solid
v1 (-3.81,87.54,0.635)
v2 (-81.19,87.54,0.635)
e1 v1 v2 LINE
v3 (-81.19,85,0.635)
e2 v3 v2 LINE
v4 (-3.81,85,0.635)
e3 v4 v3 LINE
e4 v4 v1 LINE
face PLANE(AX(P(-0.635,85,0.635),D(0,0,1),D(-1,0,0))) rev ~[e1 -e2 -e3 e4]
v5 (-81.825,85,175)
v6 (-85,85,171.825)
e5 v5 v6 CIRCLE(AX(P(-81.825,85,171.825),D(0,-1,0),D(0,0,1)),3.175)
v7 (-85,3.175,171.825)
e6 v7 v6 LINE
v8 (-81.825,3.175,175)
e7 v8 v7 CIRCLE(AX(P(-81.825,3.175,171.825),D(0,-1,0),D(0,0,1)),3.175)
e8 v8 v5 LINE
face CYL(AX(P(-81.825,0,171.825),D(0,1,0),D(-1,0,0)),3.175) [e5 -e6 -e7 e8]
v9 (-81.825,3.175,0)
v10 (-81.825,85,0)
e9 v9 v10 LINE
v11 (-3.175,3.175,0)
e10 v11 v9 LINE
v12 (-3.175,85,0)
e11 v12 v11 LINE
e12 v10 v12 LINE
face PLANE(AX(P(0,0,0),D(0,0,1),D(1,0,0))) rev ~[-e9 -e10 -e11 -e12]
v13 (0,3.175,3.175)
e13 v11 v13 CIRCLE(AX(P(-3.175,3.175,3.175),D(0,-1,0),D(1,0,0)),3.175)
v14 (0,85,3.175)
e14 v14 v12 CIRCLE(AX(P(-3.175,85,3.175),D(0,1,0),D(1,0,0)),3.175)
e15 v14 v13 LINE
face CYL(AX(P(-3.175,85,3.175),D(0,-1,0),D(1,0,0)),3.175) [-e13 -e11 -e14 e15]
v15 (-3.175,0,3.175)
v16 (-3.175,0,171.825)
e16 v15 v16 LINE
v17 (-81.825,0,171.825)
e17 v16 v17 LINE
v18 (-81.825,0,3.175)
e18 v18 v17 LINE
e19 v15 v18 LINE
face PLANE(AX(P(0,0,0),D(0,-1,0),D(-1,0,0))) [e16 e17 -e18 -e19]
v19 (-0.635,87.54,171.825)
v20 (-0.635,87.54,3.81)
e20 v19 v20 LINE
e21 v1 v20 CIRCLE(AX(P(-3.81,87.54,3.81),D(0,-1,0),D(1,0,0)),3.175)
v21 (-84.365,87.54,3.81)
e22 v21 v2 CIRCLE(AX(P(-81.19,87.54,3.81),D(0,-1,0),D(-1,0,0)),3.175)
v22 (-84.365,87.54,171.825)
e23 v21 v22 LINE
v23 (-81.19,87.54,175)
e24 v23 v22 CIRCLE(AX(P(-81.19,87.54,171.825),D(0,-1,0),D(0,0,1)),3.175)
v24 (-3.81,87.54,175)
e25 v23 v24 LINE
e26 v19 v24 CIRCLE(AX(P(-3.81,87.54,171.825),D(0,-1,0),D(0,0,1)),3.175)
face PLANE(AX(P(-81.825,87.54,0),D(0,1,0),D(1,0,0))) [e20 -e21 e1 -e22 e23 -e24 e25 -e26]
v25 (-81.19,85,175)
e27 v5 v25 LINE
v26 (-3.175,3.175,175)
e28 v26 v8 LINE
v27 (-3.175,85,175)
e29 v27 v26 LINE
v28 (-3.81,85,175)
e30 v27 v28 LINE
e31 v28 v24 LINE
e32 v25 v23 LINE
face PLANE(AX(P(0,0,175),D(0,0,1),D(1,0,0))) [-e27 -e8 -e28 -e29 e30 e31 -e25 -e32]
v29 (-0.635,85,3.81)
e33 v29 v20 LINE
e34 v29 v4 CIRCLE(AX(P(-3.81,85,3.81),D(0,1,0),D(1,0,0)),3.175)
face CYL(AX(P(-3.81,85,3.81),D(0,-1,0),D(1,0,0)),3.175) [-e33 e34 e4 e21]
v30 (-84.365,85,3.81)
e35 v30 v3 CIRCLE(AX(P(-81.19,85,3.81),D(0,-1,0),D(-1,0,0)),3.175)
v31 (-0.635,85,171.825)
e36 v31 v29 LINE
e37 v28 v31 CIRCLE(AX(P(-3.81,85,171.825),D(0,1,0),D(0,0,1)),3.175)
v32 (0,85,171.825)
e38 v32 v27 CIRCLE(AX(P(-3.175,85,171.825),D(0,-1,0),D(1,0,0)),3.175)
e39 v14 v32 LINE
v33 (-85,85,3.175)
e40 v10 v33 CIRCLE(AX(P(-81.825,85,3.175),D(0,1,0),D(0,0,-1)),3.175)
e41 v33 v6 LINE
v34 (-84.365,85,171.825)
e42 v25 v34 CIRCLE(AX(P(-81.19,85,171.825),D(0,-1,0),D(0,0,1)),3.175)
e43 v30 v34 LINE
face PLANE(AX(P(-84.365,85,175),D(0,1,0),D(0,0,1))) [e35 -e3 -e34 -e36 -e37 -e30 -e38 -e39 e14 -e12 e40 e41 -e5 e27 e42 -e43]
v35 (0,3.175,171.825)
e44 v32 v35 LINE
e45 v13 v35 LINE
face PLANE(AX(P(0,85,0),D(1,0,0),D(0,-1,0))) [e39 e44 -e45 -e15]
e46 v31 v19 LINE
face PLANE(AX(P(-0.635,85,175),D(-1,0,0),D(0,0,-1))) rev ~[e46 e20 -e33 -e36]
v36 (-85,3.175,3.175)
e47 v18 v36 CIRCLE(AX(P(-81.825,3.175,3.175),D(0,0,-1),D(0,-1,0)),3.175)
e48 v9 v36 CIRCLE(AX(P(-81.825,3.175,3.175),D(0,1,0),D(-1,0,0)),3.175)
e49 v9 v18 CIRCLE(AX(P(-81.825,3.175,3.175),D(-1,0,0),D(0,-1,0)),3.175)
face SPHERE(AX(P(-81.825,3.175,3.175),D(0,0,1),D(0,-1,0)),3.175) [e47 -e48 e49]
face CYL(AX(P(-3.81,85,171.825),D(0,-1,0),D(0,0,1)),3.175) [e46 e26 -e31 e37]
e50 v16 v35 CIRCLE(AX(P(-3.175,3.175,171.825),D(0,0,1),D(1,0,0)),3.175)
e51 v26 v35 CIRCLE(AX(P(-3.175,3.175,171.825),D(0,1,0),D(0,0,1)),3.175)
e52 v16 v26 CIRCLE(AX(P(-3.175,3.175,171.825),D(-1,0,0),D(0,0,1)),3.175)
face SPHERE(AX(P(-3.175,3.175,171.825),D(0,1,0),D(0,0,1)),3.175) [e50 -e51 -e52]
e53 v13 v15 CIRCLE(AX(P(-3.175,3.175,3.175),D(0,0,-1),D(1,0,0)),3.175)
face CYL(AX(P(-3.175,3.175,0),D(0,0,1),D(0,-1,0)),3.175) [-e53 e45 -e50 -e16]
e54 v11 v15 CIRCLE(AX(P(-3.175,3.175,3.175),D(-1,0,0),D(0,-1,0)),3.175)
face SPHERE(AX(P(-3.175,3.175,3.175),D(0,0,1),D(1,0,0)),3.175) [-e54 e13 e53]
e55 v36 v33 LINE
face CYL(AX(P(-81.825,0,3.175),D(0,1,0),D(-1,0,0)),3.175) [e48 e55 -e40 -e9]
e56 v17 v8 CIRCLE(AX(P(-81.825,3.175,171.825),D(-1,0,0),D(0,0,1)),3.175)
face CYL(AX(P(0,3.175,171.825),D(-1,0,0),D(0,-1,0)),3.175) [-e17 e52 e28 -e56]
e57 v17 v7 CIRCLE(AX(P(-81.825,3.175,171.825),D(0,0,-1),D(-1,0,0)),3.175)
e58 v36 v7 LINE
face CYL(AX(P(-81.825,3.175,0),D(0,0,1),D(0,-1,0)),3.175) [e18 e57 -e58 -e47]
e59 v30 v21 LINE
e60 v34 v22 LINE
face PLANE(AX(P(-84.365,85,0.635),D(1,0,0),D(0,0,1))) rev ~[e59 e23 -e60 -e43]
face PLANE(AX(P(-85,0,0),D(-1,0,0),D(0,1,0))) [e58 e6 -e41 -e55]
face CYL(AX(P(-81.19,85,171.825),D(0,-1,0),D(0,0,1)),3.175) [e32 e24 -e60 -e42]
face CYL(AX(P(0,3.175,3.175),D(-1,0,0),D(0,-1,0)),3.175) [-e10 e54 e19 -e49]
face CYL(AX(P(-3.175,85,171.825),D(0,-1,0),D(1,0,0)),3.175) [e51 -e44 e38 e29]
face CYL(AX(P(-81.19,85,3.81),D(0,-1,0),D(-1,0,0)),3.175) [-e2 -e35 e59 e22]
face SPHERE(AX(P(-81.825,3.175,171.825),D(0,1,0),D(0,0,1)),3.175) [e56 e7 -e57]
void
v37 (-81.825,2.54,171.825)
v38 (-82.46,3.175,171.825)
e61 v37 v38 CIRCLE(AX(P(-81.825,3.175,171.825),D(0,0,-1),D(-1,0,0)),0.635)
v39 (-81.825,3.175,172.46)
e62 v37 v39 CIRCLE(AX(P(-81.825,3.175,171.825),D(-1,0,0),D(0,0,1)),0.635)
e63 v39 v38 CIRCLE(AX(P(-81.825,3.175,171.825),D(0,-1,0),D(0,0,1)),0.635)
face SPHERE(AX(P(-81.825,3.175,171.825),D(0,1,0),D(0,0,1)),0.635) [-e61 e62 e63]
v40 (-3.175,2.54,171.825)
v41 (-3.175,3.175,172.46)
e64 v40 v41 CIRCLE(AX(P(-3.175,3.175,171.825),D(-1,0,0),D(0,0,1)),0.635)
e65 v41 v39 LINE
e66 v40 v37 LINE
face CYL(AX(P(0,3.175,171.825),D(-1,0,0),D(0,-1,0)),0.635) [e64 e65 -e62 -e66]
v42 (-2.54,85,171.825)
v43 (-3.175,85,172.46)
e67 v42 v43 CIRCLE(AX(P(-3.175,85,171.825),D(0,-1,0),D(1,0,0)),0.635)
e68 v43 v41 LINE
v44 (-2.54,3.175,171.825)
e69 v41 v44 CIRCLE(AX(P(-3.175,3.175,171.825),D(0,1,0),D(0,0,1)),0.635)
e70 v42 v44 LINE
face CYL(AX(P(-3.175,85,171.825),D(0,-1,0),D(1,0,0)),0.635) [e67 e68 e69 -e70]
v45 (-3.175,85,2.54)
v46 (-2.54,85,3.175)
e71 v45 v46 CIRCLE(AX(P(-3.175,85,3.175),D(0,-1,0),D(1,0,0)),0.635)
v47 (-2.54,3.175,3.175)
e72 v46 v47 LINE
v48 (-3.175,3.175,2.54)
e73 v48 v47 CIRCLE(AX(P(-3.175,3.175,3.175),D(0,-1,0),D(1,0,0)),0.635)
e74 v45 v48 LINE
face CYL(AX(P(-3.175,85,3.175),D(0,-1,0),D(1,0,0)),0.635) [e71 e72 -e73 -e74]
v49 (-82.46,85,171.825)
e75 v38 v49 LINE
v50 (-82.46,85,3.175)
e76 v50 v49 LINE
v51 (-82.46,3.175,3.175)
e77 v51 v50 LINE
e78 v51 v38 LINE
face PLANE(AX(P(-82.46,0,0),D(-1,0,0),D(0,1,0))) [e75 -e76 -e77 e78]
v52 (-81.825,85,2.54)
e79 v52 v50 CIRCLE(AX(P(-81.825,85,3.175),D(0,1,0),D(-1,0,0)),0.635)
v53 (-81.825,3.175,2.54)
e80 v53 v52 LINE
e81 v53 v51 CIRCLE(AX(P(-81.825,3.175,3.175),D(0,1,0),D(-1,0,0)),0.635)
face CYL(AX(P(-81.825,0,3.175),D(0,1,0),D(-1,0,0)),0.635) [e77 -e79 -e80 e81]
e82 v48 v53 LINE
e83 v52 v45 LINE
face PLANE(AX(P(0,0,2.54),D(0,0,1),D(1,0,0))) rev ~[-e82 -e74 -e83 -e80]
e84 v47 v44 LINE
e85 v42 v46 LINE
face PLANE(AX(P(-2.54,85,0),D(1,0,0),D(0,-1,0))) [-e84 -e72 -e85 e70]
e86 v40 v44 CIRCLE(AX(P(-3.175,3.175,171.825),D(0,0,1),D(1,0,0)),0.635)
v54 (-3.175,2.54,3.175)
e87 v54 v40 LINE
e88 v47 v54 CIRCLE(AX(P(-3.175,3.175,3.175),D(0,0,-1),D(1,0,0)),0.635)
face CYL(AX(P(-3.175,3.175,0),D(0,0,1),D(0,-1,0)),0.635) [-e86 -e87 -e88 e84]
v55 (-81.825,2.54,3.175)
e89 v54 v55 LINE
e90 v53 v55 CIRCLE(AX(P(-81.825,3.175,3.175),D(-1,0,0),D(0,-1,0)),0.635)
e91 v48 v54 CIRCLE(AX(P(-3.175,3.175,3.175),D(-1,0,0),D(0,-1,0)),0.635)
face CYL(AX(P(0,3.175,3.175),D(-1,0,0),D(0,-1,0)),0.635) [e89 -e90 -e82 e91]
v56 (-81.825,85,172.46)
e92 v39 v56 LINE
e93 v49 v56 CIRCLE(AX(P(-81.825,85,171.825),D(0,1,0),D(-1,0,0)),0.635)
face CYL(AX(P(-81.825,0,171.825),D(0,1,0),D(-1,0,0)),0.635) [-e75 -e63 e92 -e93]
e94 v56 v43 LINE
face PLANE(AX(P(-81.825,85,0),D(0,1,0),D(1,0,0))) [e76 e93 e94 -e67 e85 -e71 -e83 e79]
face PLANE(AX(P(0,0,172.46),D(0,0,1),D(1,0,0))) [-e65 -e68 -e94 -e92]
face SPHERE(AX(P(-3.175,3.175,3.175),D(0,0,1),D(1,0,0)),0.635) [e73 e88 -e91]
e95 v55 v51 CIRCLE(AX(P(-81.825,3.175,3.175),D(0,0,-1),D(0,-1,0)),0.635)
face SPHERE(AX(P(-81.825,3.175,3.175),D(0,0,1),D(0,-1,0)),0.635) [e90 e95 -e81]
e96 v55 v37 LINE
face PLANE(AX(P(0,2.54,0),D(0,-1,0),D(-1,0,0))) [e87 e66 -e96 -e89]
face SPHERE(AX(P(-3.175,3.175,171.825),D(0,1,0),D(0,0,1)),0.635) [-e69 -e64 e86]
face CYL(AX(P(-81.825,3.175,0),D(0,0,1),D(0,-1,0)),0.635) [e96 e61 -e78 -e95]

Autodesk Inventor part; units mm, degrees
ref_plane "YZ Plane" through (0, 0, 0) normal (1, 0, 0) x (0, 1, 0)
ref_plane "XZ Plane" through (0, 0, 0) normal (0, 1, 0) x (-1, 0, 0)
ref_plane "XY Plane" through (0, 0, 0) normal (0, 0, 1) x (1, 0, 0)
sketch "Sketch1" plane through (0, 0, 0) normal (0, 0, 1) x (1, 0, 0)
  line L0 (0, 0) -> (-85, 0)
  line L1 (-85, 0) -> (-85, 85)
  line L2 (-85, 85) -> (0, 85)
  line L3 (0, 85) -> (0, 0)
  dimension "d0" = 85
  dimension "d1" = 85
extrude "Extrusion1" add sketch "Sketch1" along normal blind 175
fillet "Fillet2" radius 3.175 8 edges at (-85, 42.5, 175) (0, 42.5, 175) (-42.5, 0, 175) (-85, 0, 87.5) (0, 0, 87.5) (0, 42.5, 0) (-42.5, 0, 0) (-85, 42.5, 0)
shell "Shell1" thickness 2.54 removed faces 1 at (-28.3333, 85, 59.3917)
sketch "Sketch2" plane through (-81.825, 85, 0) normal (0, 1, 0) x (1, 0, 0)
  line L0 (-2.54, -175) -> (81.19, -175)
  line L1 (81.19, -175) -> (81.19, -0.635)
  line L2 (81.19, -0.635) -> (-2.54, -0.635)
  line L3 (-2.54, -0.635) -> (-2.54, -175)
  point P0 (81.825, 0)
  point P1 (0, -172.46)
  point P2 (78.65, -3.175)
extrude "Extrusion2" add sketch "Sketch2" along normal blind 2.54
fillet "Fillet3" radius 3.175 4 edges at (-84.365, 86.27, 175) (-0.635, 86.27, 175) (-0.635, 86.27, 0.635) (-84.365, 86.27, 0.635)
properties part number "AC_power_box" material "Iron, Cast"
